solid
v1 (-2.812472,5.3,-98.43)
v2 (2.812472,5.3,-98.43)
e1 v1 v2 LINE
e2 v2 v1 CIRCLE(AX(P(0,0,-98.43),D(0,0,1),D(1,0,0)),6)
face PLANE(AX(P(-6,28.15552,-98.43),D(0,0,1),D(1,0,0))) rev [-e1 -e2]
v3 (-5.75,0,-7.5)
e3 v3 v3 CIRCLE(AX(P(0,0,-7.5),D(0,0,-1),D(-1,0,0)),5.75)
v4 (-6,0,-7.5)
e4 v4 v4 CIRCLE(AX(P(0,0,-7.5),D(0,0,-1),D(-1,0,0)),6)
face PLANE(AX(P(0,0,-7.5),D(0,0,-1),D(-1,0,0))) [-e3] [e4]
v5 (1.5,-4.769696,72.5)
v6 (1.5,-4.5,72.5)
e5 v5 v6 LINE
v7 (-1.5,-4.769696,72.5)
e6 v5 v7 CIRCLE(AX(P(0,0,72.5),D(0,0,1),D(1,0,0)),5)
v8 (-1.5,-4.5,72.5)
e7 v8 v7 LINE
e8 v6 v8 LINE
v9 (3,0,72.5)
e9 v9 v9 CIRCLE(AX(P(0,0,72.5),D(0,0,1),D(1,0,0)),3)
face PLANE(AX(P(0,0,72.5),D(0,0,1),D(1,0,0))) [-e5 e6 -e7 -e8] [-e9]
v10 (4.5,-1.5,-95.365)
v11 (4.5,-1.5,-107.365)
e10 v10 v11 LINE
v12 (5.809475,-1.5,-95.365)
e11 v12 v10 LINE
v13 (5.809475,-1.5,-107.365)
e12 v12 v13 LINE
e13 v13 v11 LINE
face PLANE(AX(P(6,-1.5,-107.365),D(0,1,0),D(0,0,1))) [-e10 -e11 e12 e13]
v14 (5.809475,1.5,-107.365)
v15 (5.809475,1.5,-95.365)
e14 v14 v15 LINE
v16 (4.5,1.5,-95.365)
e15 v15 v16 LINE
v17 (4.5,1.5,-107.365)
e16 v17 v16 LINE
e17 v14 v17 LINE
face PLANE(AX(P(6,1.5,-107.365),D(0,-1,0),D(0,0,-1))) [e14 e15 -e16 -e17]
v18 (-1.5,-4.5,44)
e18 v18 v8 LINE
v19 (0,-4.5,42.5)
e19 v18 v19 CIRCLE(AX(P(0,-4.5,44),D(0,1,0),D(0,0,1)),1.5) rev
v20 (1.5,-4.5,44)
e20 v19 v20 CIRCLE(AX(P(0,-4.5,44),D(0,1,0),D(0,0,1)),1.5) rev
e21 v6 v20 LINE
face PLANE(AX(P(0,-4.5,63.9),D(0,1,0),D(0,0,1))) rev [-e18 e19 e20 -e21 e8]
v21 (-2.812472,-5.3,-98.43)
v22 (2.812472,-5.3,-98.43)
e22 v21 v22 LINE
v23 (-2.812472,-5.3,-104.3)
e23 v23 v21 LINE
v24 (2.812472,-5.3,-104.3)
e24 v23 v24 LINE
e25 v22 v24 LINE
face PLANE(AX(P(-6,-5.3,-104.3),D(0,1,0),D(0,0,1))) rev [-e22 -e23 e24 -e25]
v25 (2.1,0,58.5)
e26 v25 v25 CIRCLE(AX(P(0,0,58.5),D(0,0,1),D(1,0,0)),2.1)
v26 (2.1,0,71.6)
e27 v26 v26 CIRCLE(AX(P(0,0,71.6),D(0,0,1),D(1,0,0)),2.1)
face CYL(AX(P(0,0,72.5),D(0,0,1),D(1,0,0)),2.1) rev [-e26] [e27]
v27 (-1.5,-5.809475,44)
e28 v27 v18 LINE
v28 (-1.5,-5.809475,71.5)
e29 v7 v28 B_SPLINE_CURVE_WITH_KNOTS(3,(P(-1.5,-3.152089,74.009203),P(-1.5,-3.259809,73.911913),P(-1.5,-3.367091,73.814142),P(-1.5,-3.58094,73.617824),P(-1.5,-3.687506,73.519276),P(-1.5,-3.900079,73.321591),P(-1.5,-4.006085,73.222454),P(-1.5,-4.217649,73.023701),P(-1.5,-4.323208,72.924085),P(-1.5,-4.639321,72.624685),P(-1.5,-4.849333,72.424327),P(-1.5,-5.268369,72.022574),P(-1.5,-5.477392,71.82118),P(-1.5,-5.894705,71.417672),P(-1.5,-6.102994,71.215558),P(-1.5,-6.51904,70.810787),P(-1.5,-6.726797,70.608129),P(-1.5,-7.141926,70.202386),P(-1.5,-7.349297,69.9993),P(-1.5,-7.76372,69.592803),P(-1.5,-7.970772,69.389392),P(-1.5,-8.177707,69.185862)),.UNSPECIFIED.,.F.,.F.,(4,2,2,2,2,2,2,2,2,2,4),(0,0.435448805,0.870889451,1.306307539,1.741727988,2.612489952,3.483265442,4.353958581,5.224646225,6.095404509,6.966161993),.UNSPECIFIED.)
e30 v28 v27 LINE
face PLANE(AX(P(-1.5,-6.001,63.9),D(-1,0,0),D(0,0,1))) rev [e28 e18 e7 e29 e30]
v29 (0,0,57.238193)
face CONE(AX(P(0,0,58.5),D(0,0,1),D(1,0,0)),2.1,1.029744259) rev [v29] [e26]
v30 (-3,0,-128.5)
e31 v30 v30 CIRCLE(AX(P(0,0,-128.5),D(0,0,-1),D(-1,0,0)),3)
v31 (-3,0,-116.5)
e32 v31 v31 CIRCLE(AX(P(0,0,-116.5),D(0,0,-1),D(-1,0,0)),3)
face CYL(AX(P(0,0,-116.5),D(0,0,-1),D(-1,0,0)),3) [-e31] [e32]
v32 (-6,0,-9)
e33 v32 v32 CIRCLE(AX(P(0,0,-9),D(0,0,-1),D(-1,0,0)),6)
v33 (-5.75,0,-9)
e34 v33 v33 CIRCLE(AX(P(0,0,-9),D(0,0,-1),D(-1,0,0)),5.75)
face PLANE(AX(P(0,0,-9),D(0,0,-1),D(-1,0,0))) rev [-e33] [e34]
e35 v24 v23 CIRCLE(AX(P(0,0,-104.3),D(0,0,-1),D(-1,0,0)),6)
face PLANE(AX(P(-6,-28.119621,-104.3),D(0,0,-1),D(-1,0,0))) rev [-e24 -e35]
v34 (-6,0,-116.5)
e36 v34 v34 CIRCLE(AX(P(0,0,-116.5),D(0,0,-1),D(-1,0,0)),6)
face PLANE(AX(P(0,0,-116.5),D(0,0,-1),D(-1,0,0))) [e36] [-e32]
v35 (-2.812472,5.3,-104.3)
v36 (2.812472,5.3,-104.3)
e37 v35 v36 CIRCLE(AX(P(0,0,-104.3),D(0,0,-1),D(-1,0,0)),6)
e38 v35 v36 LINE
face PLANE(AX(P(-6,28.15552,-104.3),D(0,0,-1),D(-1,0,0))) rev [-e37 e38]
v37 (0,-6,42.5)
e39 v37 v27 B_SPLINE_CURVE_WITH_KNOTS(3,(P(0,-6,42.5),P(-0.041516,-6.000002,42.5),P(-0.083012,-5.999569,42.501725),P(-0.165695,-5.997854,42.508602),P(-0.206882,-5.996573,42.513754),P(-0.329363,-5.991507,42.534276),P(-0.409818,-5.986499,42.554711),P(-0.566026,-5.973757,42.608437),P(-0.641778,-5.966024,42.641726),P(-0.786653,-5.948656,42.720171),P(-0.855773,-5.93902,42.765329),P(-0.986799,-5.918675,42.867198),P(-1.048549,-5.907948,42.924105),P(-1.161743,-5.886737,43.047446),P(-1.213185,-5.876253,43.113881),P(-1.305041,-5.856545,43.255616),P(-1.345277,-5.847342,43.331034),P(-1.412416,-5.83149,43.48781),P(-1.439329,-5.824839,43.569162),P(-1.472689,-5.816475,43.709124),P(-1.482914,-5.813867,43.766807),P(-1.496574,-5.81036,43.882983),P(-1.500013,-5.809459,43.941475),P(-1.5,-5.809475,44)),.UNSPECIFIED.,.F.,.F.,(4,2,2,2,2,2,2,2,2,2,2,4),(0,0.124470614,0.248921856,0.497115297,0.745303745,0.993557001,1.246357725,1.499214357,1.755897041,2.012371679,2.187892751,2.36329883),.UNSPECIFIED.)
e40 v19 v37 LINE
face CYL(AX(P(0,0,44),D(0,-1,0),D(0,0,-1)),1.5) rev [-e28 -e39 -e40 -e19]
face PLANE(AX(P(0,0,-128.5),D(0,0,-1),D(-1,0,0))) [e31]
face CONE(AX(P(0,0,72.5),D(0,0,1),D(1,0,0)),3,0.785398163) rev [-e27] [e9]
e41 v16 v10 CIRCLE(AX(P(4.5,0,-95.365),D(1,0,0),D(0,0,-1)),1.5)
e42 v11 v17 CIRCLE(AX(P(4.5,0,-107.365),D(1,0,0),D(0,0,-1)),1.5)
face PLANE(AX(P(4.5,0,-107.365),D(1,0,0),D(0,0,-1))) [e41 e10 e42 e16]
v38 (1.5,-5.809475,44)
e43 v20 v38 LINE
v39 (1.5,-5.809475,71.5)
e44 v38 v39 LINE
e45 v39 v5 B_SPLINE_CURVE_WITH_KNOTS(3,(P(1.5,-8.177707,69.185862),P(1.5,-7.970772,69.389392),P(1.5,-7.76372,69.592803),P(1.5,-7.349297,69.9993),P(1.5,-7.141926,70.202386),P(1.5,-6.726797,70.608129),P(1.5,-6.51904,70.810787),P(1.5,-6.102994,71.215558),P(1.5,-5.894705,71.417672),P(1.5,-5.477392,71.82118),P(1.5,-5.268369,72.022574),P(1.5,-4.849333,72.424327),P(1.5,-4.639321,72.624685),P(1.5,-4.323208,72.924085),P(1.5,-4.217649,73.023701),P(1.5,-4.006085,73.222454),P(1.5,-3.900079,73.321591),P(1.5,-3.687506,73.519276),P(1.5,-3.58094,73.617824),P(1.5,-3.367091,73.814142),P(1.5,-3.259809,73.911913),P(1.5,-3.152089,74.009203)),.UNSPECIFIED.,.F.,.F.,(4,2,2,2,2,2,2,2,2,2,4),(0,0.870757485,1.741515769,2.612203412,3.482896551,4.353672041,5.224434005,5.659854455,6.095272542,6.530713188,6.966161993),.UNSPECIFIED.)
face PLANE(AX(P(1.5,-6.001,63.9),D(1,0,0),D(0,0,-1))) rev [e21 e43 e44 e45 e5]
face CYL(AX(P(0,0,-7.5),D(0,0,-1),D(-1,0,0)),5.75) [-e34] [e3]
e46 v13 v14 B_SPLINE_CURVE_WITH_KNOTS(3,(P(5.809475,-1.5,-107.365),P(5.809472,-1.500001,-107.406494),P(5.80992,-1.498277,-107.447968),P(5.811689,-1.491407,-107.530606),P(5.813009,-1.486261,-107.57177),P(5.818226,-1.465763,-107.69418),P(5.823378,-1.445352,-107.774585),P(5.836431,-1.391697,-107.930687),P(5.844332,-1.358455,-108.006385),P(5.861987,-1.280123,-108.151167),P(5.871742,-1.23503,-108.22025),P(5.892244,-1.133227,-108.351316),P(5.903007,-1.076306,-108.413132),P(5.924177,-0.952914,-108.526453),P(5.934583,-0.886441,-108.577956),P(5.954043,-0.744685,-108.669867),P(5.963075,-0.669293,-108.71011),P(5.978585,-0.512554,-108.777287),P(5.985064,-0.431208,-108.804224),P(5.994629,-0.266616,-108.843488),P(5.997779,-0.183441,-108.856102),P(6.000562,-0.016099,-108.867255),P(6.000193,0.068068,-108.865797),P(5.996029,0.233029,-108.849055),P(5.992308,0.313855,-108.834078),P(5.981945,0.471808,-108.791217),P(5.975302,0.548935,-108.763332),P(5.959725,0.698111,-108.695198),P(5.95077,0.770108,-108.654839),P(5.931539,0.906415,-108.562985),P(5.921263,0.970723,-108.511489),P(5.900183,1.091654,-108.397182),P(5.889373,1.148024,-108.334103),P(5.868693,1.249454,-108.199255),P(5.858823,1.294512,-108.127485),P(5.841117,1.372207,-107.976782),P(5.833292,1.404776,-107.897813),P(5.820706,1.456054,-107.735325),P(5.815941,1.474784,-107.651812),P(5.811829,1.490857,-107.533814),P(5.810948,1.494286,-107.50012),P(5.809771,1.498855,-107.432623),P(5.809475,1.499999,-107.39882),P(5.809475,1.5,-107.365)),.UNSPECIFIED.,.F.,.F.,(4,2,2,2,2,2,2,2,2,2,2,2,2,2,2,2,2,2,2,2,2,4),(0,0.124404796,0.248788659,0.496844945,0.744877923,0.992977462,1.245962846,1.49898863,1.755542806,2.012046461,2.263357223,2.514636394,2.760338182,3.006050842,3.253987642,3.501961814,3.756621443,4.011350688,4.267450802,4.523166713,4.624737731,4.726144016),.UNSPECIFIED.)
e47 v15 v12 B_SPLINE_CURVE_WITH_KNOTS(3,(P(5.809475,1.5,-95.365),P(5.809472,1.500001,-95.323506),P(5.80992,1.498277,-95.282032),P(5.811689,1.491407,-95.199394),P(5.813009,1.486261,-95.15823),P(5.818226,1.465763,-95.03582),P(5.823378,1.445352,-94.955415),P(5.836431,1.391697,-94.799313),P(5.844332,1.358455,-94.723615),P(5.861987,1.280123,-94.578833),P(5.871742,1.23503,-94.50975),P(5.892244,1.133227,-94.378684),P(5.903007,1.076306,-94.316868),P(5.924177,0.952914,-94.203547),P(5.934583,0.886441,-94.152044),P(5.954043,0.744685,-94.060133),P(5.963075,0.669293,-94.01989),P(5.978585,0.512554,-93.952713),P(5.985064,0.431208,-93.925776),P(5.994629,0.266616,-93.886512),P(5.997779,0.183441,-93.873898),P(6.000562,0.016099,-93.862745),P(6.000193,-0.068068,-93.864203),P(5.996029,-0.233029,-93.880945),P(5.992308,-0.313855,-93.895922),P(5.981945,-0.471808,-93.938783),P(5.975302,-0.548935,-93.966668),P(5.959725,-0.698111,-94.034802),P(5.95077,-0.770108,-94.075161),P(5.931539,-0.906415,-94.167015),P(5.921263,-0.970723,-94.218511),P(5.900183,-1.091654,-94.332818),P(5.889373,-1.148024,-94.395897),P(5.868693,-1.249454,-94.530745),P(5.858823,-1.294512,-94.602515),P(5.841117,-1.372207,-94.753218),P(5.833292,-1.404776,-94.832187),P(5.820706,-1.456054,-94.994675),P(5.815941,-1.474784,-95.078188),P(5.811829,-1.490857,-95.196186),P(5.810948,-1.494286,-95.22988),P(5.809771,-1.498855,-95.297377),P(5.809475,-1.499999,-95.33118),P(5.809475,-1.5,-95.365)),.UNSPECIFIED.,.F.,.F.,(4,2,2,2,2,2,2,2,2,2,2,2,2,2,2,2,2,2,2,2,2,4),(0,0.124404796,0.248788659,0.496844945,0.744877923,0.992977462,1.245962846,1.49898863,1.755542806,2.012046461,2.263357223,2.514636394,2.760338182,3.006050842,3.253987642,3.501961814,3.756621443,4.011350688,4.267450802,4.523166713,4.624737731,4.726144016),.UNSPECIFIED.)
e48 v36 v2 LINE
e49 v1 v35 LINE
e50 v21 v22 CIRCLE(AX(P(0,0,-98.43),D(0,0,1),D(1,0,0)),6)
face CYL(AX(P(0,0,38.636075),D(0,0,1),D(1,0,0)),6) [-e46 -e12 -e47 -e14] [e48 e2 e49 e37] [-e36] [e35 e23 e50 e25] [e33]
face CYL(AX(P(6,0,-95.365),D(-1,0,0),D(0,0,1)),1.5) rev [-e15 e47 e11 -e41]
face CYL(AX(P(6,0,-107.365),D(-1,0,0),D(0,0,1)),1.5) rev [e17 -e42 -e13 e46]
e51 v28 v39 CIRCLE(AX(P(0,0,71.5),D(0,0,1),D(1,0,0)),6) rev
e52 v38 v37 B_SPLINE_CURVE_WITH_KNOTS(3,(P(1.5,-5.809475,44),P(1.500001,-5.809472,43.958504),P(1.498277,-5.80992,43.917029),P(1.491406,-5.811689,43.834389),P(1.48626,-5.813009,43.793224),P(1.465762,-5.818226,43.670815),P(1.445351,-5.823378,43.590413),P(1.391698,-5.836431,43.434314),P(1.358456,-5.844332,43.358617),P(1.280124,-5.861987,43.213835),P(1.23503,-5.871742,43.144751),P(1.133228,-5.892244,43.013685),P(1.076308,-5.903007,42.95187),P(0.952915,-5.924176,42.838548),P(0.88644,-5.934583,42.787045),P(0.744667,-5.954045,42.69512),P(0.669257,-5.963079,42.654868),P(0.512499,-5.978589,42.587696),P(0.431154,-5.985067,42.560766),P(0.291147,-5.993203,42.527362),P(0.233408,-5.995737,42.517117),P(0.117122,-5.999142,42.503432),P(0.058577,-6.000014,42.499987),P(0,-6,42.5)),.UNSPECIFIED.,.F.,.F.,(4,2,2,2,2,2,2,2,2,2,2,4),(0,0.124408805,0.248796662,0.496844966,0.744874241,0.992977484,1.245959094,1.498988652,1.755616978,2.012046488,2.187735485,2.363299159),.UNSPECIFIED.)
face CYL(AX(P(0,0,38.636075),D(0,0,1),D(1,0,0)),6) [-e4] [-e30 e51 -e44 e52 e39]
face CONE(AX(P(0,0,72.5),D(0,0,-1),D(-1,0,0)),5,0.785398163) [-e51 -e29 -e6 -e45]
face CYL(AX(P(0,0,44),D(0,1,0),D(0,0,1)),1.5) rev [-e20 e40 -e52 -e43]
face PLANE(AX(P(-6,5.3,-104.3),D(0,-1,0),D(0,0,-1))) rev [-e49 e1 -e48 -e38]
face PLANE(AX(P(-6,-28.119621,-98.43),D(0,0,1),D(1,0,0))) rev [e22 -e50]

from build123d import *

# Parameters (mm, degrees)
SKETCH1_W                   = 107.1
SKETCH1_H                   = 6
SKETCH18_R                  = 6
BOSS_EXTRUDE1_DEPTH         = 72.5
CUT_EXTRUDE4_REACH          = 113.936
CUT_EXTRUDE4_END_RADIUS     = 6
CUT_EXTRUDE4_START          = -4.5
M5_TAPPED_HOLE3_D           = 4.2
M5_TAPPED_HOLE3_DEPTH       = 14
M5_TAPPED_HOLE3_CSINK_D     = 6
M5_TAPPED_HOLE3_CSINK_ANGLE = 90
M5_TAPPED_HOLE3_TIP         = 1.2618073
BOSS_EXTRUDE2_START         = 21.4
SKETCH22_R                  = 6
BOSS_EXTRUDE2_DEPTH         = 21.4
CHAMFER2_SIZE               = 1
SKETCH25_W                  = 3
SKETCH25_H                  = 3
CUT_EXTRUDE5_DEPTH          = 30
FILLET2_R                   = 1.5
SKETCH30_OUTSIDE_W          = 54.344
SKETCH30_OUTSIDE_H          = 54.344
SKETCH30_OUTSIDE_R          = 3
CUT_EXTRUDE10_DEPTH         = 12
CUT_EXTRUDE11_DEPTH         = 129.779850918
CUT_EXTRUDE11_DEPTH_BACK    = 129.779850918
SKETCH31_W                  = 5.87
SKETCH31_H                  = 22.819621357
SKETCH31_H_2                = 22.855520271
CUT_EXTRUDE12_START         = 4.5
CUT_EXTRUDE12_DEPTH         = 125.279850918
CUT_EXTRUDE13_START         = 50.3
SKETCH33_OUTSIDE_W          = 54.344
SKETCH33_OUTSIDE_H          = 54.344
SKETCH33_OUTSIDE_R          = 5.75
CUT_EXTRUDE13_DEPTH         = 1.5


with BuildPart() as part:
    # Sketch1 → Revolve1 (revolve)
    with BuildSketch(Plane(origin=(0, 0, 0), x_dir=(0, 0, -1), z_dir=(1, 0, 0)), mode=Mode.PRIVATE) as revolve1_sk:
        with Locations((53.55, 3)):
            Rectangle(SKETCH1_W, SKETCH1_H)
    revolve(revolve1_sk.sketch.rotate(Axis((0, 0, 38.636074766), (0, 0, -1)), 90), axis=Axis((0, 0, 38.636074766), (0, 0, -1)))

    # Sketch18 → Boss-Extrude1 (add)
    with BuildSketch(Plane.XY):
        Circle(SKETCH18_R)
    extrude(amount=BOSS_EXTRUDE1_DEPTH)

    # Cut-Extrude4: up to this cylinder (the profile starts inside it)
    cut_extrude4_end = Plane(origin=(0, 0, 57.9), z_dir=(0, 0, 1)) * Cylinder(CUT_EXTRUDE4_END_RADIUS, 240.872, mode=Mode.PRIVATE)
    # Sketch19 → Cut-Extrude4 (cut, up to the surface)
    with BuildSketch(Plane(origin=(0, 0, 0), x_dir=(1, 0, 0), z_dir=(0, 1, 0)).offset(CUT_EXTRUDE4_START), mode=Mode.PRIVATE) as cut_extrude4_sk1:
        with BuildLine():
            Line((-1.5, -63.9), (-1.5, -51.9))
            ThreePointArc((-1.5, -51.9), (0, -50.4), (1.5, -51.9))
            Line((1.5, -51.9), (1.5, -63.9))
            ThreePointArc((1.5, -63.9), (0, -65.4), (-1.5, -63.9))
        make_face()
    cut_extrude4_tool1 = extrude(cut_extrude4_sk1.sketch, amount=-CUT_EXTRUDE4_REACH, mode=Mode.PRIVATE) & cut_extrude4_end
    add(cut_extrude4_tool1.solids().sort_by_distance((0, -4.5, 57.9))[0], mode=Mode.SUBTRACT)

    # M5 Tapped Hole3
    with Locations(Plane.XY.offset(72.5)):
        with Locations((0, 0)):
            CounterSinkHole(M5_TAPPED_HOLE3_D / 2, M5_TAPPED_HOLE3_CSINK_D / 2, depth=M5_TAPPED_HOLE3_DEPTH, counter_sink_angle=M5_TAPPED_HOLE3_CSINK_ANGLE)
            with Locations((0, 0, -(M5_TAPPED_HOLE3_DEPTH + M5_TAPPED_HOLE3_TIP / 2))):  # 118° drill point
                Cone(0, M5_TAPPED_HOLE3_D / 2, M5_TAPPED_HOLE3_TIP, mode=Mode.SUBTRACT)

    # Sketch22 → Boss-Extrude2 (add)
    with BuildSketch(Plane(origin=(0, 0, -107.1), x_dir=(-1, 0, 0), z_dir=(0, 0, -1)).offset(BOSS_EXTRUDE2_START)):
        with Locations(Location((0, 0, 0), (0, 0, 180))):
            Circle(SKETCH22_R)
    extrude(amount=-BOSS_EXTRUDE2_DEPTH)

    # Chamfer2
    chamfer2_edges = [part.edges().sort_by_distance(p)[0] for p in [
        (-6, 0, 72.5),
    ]]
    chamfer(chamfer2_edges, length=CHAMFER2_SIZE)

    # Sketch25 → Cut-Extrude5 (cut)
    with BuildSketch(Plane.XY.offset(72.5)):
        with Locations((0, -6)):
            Rectangle(SKETCH25_W, SKETCH25_H)
    extrude(amount=-CUT_EXTRUDE5_DEPTH, mode=Mode.SUBTRACT)

    # Fillet2
    fillet2_edges = [part.edges().sort_by_distance(p)[0] for p in [
        (1.5, -5.15473751, 42.5),
        (-1.5, -5.15473751, 42.5),
    ]]
    fillet(fillet2_edges, radius=FILLET2_R - 0.0001)  # a hair under: the kernel refuses the full size

    # Sketch30 outside → Cut-Extrude10 (cut)
    with BuildSketch(Plane(origin=(0, 0, -128.5), x_dir=(-1, 0, 0), z_dir=(0, 0, -1))):
        Rectangle(SKETCH30_OUTSIDE_W, SKETCH30_OUTSIDE_H)
        Circle(SKETCH30_OUTSIDE_R, mode=Mode.SUBTRACT)
    extrude(amount=-CUT_EXTRUDE10_DEPTH, mode=Mode.SUBTRACT)

    # Sketch31 → Cut-Extrude11 (cut, two sides: drawn at the far end of the back side and taken through both)
    with BuildSketch(Plane(origin=(0, 0, 0), x_dir=(0, 0, -1), z_dir=(1, 0, 0)).offset(-CUT_EXTRUDE11_DEPTH_BACK)):
        with Locations((101.365, -16.709810679)):
            Rectangle(SKETCH31_W, SKETCH31_H)
        with Locations((101.365, 16.727760135)):
            Rectangle(SKETCH31_W, SKETCH31_H_2)
    extrude(amount=CUT_EXTRUDE11_DEPTH + CUT_EXTRUDE11_DEPTH_BACK, mode=Mode.SUBTRACT)

    # Sketch32 → Cut-Extrude12 (cut, through all)
    with BuildSketch(Plane(origin=(0, 0, 0), x_dir=(0, 0, -1), z_dir=(1, 0, 0)).offset(CUT_EXTRUDE12_START)):
        with BuildLine():
            Line((107.365, -1.5), (95.365, -1.5))
            ThreePointArc((95.365, -1.5), (93.865, 0), (95.365, 1.5))
            Line((95.365, 1.5), (107.365, 1.5))
            ThreePointArc((107.365, 1.5), (108.865, 0), (107.365, -1.5))
        make_face()
    extrude(amount=CUT_EXTRUDE12_DEPTH, mode=Mode.SUBTRACT)

    # Sketch33 outside → Cut-Extrude13 (cut)
    with BuildSketch(Plane(origin=(0, 0, 41.3), x_dir=(-1, 0, 0), z_dir=(0, 0, -1)).offset(CUT_EXTRUDE13_START)):
        Rectangle(SKETCH33_OUTSIDE_W, SKETCH33_OUTSIDE_H)
        Circle(SKETCH33_OUTSIDE_R, mode=Mode.SUBTRACT)
    extrude(amount=-CUT_EXTRUDE13_DEPTH, mode=Mode.SUBTRACT)


solid = part.part
